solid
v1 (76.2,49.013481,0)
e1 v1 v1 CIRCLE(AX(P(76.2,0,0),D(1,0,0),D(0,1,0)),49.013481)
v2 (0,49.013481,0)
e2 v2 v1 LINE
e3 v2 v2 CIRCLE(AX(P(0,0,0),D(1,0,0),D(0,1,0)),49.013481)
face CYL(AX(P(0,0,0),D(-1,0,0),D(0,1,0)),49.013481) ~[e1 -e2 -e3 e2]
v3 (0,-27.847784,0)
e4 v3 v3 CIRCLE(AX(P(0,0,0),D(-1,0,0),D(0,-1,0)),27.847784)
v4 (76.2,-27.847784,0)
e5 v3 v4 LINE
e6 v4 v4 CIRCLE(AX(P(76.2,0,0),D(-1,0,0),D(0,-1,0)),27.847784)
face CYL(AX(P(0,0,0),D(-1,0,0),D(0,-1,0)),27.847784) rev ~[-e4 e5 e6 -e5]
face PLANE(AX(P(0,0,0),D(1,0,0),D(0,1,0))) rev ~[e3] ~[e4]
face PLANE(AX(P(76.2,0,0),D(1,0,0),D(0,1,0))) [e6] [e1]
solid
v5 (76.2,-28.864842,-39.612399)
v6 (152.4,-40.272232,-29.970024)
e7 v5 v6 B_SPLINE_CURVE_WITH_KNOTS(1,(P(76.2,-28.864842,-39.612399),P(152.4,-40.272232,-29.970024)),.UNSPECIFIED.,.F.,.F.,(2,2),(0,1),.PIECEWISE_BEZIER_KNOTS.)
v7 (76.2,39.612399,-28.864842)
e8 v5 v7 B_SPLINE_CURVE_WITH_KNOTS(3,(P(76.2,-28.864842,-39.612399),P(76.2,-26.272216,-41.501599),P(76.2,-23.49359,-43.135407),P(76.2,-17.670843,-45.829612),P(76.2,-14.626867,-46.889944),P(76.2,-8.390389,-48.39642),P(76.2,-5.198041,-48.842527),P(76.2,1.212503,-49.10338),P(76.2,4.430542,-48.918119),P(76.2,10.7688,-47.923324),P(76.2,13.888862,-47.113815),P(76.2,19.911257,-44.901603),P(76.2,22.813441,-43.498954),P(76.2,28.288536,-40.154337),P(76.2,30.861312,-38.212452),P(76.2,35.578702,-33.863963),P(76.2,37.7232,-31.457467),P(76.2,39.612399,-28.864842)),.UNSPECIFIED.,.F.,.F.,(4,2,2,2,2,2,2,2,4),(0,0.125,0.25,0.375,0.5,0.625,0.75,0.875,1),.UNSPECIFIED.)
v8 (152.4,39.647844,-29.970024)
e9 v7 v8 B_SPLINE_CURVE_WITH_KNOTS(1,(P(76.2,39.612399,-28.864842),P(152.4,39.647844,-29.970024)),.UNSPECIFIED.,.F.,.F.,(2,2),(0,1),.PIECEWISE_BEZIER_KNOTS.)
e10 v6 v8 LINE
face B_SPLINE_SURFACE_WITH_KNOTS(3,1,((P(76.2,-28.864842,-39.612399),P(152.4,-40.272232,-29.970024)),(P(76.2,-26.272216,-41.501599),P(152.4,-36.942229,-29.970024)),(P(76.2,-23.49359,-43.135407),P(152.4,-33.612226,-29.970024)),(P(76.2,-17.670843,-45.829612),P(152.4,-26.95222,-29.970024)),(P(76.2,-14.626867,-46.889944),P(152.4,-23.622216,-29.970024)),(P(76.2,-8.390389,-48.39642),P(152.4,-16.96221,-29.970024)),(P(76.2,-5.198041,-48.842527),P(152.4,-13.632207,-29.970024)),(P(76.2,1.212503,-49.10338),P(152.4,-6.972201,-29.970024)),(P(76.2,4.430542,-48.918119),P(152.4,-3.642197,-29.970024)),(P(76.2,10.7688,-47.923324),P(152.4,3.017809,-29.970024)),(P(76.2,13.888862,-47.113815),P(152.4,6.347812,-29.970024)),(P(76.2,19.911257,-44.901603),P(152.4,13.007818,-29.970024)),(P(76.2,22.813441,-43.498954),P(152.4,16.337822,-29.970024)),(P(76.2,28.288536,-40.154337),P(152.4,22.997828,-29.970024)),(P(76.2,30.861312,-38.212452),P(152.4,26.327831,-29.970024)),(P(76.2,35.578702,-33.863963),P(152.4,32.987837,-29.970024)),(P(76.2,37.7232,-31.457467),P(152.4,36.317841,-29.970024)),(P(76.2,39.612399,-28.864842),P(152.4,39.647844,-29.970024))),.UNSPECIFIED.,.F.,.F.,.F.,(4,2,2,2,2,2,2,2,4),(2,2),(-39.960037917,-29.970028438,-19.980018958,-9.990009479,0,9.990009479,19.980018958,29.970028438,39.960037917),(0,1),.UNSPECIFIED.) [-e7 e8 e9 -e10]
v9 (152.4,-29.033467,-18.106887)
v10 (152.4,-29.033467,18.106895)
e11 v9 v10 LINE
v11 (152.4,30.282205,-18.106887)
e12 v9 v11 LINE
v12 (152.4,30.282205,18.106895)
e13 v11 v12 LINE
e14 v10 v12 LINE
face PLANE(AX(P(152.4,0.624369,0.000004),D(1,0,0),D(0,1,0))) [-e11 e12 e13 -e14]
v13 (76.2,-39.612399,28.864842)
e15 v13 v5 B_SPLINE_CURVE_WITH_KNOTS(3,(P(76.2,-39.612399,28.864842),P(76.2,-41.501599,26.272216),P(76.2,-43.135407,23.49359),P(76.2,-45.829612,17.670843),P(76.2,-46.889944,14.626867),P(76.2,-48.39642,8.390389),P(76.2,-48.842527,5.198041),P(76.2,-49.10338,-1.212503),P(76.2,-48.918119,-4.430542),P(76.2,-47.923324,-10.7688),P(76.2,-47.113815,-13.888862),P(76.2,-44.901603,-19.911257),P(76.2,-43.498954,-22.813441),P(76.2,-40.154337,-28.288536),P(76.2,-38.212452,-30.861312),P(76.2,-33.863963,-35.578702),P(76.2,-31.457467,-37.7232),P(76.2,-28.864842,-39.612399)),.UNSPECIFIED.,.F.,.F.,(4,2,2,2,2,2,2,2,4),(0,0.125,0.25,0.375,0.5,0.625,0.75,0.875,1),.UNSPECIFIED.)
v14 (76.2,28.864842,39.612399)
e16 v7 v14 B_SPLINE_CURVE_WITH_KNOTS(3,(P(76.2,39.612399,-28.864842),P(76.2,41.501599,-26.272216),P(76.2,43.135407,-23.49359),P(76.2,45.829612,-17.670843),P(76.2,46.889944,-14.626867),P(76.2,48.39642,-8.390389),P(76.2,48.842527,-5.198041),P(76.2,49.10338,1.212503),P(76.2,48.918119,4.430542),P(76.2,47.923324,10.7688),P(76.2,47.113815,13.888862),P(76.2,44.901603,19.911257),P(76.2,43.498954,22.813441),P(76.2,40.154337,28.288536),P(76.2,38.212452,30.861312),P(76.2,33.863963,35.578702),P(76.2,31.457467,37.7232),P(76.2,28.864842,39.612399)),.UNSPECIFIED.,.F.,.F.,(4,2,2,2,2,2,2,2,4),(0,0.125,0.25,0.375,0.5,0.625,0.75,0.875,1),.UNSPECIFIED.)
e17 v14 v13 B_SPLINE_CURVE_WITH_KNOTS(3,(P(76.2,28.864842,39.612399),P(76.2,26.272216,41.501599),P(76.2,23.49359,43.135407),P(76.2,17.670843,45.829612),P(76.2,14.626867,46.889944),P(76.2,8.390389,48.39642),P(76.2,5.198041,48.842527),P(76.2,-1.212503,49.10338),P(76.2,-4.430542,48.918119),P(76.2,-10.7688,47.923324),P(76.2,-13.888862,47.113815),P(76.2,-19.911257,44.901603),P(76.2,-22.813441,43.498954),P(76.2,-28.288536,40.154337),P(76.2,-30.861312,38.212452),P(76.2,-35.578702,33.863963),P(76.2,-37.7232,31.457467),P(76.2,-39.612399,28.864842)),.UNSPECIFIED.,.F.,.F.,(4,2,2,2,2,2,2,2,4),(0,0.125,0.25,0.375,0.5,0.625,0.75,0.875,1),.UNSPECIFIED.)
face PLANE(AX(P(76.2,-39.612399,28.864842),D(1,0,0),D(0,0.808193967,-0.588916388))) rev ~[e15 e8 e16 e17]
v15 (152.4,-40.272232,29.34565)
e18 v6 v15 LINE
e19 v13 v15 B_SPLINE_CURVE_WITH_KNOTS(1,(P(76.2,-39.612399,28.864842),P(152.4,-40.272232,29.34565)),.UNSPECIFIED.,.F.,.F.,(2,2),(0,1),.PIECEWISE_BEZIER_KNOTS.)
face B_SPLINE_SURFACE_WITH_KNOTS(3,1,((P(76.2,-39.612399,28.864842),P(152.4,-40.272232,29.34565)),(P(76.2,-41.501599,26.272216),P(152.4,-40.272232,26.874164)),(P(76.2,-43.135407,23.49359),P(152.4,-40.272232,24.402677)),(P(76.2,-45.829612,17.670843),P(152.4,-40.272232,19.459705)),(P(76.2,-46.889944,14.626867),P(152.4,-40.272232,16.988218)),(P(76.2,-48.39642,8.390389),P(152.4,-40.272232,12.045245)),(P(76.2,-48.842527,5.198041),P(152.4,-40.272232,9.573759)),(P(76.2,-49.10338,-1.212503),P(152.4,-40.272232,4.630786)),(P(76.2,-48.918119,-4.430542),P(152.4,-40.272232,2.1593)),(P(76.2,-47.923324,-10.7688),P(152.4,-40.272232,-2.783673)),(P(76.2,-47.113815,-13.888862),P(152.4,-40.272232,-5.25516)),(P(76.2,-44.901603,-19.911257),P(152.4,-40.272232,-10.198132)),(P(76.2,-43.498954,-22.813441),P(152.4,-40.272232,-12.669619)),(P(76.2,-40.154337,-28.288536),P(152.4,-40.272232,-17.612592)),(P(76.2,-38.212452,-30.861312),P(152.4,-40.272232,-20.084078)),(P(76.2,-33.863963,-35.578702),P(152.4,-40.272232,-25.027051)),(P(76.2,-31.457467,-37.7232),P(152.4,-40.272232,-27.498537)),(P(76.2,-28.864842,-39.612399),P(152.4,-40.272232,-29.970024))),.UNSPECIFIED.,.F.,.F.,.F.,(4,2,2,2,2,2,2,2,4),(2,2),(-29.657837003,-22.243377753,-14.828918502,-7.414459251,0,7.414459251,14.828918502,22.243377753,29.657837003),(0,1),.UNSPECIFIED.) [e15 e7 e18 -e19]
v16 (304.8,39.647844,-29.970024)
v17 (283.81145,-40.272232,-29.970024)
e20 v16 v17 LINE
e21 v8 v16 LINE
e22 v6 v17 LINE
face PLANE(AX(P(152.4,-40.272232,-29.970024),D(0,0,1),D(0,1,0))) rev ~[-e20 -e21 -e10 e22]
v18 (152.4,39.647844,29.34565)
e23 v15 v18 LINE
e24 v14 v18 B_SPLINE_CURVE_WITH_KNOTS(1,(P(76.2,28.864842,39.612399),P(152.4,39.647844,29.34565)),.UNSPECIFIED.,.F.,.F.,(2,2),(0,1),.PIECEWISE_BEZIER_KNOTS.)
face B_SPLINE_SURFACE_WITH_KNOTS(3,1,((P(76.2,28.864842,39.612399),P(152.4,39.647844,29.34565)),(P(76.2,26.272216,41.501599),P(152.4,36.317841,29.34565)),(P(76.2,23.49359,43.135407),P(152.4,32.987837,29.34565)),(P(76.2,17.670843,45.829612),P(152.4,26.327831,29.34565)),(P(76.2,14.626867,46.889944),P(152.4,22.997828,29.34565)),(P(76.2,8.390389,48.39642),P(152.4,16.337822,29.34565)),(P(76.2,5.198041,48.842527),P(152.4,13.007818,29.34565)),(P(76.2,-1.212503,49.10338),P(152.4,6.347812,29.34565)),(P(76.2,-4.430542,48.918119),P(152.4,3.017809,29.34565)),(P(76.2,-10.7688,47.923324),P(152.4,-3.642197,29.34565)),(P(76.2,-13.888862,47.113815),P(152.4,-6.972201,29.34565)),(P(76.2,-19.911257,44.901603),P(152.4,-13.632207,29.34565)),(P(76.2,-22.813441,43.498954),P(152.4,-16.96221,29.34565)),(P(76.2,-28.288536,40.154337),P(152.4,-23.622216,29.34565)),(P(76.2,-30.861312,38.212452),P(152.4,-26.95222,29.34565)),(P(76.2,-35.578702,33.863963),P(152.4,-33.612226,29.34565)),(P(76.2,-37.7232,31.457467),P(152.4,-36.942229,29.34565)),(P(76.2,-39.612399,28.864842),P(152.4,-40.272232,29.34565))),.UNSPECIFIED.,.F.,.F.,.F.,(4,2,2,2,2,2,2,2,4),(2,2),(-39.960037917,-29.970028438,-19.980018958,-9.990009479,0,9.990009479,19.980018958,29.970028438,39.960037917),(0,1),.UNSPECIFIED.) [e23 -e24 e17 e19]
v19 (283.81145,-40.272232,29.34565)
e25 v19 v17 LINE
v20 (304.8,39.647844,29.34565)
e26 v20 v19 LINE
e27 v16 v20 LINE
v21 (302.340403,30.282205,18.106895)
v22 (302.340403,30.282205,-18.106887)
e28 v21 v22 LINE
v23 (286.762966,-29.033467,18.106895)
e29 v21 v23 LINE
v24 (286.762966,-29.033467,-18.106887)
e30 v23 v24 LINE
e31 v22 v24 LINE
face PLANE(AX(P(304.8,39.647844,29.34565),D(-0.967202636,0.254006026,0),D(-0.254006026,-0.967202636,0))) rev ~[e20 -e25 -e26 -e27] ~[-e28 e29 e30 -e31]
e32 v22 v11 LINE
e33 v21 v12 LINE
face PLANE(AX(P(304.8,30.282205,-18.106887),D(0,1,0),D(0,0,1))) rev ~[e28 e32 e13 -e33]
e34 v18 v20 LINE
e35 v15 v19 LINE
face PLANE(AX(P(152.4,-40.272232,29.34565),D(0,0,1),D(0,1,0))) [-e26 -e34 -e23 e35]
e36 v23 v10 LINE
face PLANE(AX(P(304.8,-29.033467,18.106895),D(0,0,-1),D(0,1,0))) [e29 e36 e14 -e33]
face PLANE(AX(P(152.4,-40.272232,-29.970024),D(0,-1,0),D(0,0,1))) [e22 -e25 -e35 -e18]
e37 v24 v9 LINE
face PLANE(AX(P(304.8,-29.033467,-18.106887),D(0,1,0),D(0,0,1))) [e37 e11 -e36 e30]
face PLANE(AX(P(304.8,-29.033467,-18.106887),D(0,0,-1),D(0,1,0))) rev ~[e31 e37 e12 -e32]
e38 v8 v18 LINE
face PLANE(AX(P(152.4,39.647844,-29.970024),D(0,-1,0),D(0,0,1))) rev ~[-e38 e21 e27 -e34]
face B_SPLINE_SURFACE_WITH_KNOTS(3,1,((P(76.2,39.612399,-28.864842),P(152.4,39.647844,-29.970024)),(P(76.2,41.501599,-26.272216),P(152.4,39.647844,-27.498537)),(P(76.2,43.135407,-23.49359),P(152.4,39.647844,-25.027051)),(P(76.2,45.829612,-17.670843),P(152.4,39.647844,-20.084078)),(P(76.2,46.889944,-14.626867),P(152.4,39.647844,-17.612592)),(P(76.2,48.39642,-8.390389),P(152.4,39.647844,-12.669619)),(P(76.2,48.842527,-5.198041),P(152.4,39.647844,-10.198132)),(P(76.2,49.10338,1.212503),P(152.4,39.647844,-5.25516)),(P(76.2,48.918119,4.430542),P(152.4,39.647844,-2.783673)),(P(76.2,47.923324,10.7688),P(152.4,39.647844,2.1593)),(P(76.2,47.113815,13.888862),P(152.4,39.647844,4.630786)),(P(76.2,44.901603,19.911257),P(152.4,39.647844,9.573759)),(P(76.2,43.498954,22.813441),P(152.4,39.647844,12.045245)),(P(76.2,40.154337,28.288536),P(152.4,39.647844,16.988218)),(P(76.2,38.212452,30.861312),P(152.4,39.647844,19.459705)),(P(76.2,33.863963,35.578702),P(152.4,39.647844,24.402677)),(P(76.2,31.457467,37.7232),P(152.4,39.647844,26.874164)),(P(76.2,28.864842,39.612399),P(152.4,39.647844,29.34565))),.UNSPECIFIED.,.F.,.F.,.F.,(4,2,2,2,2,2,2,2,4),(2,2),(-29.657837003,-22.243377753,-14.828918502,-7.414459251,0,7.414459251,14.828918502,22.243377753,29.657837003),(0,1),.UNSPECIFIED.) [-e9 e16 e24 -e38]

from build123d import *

# Parameters (mm, degrees)
F0_R      = 49.0134805441
F1_DEPTH  = 76.2
F3_W      = 79.9200758338
F3_H      = 59.3156740069
F5_DEPTH  = 152.4
F7_DEPTH  = 59.3156740069
F9_W      = 59.3156721443
F9_H      = 36.2137816846
F10_DEPTH = 152.4
F11_R     = 27.8477837619
F12_DEPTH = 76.2


# Not quite as in the source:
# - a feature of the source that left no trace in its solid (it failed there, or was rolled back) is left out
# - the arcs of a loft's sections are written as splines that run evenly, so that the points pair up as in the source's solid


with BuildPart() as f1:
    # F0 (on Right) → F1 (new body)
    with BuildSketch(Plane.YZ):
        Circle(F0_R)
    extrude(amount=F1_DEPTH)

    # F11 (on face) → F12 (cut, through all)
    with BuildSketch(Plane(origin=(0, 0, 0), x_dir=(0, -1, 0), z_dir=(-1, 0, 0))):
        Circle(F11_R)
    extrude(amount=-F12_DEPTH, mode=Mode.SUBTRACT)


with BuildPart() as f4:
    # F1_face (on face) → F4 section 0
    with BuildSketch(Plane.YZ.offset(76.2)):
        with BuildLine():
            add(Edge.make_bspline(
                [(-39.6123992828, 28.8648419033), (-41.5015987676, 26.272216433), (-43.1354065314, 23.4935897628), (-45.8296123485, 17.6708428932), (-46.8899437823, 14.6268666727), (-48.3964196283, 8.3903887711), (-48.8425267899, 5.1980412992), (-49.1033796429, -1.2125032862), (-48.9181188841, -4.4305418863), (-47.9233243152, -10.7687995221), (-47.1138151033, -13.8888618319), (-44.9016025099, -19.9112568317), (-43.4989538297, -22.8134406061), (-40.1543373011, -28.2885357075), (-38.212452155, -30.8613116519), (-33.8639634288, -35.5787020205), (-31.4574673737, -37.723199798), (-28.8648419033, -39.6123992828)],
                knots=[0, 0, 0, 0, 0.125, 0.125, 0.25, 0.25, 0.375, 0.375, 0.5, 0.5, 0.625, 0.625, 0.75, 0.75, 0.875, 0.875, 1, 1, 1, 1], degree=3))
            add(Edge.make_bspline(
                [(-28.8648419033, -39.6123992828), (-26.272216433, -41.5015987676), (-23.4935897628, -43.1354065314), (-17.6708428932, -45.8296123485), (-14.6268666727, -46.8899437823), (-8.3903887711, -48.3964196283), (-5.1980412992, -48.8425267899), (1.2125032862, -49.1033796429), (4.4305418863, -48.9181188841), (10.7687995221, -47.9233243152), (13.8888618319, -47.1138151033), (19.9112568317, -44.9016025099), (22.8134406061, -43.4989538297), (28.2885357075, -40.1543373011), (30.8613116519, -38.212452155), (35.5787020205, -33.8639634288), (37.723199798, -31.4574673737), (39.6123992828, -28.8648419033)],
                knots=[0, 0, 0, 0, 0.125, 0.125, 0.25, 0.25, 0.375, 0.375, 0.5, 0.5, 0.625, 0.625, 0.75, 0.75, 0.875, 0.875, 1, 1, 1, 1], degree=3))
            add(Edge.make_bspline(
                [(39.6123992828, -28.8648419033), (41.5015987676, -26.272216433), (43.1354065314, -23.4935897628), (45.8296123485, -17.6708428932), (46.8899437823, -14.6268666727), (48.3964196283, -8.3903887711), (48.8425267899, -5.1980412992), (49.1033796429, 1.2125032862), (48.9181188841, 4.4305418863), (47.9233243152, 10.7687995221), (47.1138151033, 13.8888618319), (44.9016025099, 19.9112568317), (43.4989538297, 22.8134406061), (40.1543373011, 28.2885357075), (38.212452155, 30.8613116519), (33.8639634288, 35.5787020205), (31.4574673737, 37.723199798), (28.8648419033, 39.6123992828)],
                knots=[0, 0, 0, 0, 0.125, 0.125, 0.25, 0.25, 0.375, 0.375, 0.5, 0.5, 0.625, 0.625, 0.75, 0.75, 0.875, 0.875, 1, 1, 1, 1], degree=3))
            add(Edge.make_bspline(
                [(28.8648419033, 39.6123992828), (26.272216433, 41.5015987676), (23.4935897628, 43.1354065314), (17.6708428932, 45.8296123485), (14.6268666727, 46.8899437823), (8.3903887711, 48.3964196283), (5.1980412992, 48.8425267899), (-1.2125032862, 49.1033796429), (-4.4305418863, 48.9181188841), (-10.7687995221, 47.9233243152), (-13.8888618319, 47.1138151033), (-19.9112568317, 44.9016025099), (-22.8134406061, 43.4989538297), (-28.2885357075, 40.1543373011), (-30.8613116519, 38.212452155), (-35.5787020205, 33.8639634288), (-37.723199798, 31.4574673737), (-39.6123992828, 28.8648419033)],
                knots=[0, 0, 0, 0, 0.125, 0.125, 0.25, 0.25, 0.375, 0.375, 0.5, 0.5, 0.625, 0.625, 0.75, 0.75, 0.875, 0.875, 1, 1, 1, 1], degree=3))
        make_face()
    # F3 (on offset) → F4 section 1
    with BuildSketch(Plane.YZ.offset(152.4)):
        with Locations((-0.3121942282, -0.3121867776)):
            Rectangle(F3_W, F3_H)
    loft(ruled=True)

    # F5 (add): a face of the model
    f5_faces = [f4.faces().sort_by_distance(p)[0] for p in [
        (152.4, -0.3121942282, -0.3121867776),
    ]]
    extrude(f5_faces, amount=F5_DEPTH)

    # F6 (on face) → F7 (cut, through all)
    with BuildSketch(Plane.XY.offset(29.3456502259)):
        Polygon((304.8, -40.2722321451), (304.8, 39.6478436887), (283.8114500046, -40.2722321451), align=None)
    extrude(amount=-F7_DEPTH, mode=Mode.SUBTRACT)

    # F9 (on offset) → F10 (cut)
    with BuildSketch(Plane.YZ.offset(304.8)):
        with Locations((0.6243688986, 3.7253e-06)):
            Rectangle(F9_W, F9_H)
    extrude(amount=-F10_DEPTH, mode=Mode.SUBTRACT)


solid = Compound([f1.part, f4.part])
